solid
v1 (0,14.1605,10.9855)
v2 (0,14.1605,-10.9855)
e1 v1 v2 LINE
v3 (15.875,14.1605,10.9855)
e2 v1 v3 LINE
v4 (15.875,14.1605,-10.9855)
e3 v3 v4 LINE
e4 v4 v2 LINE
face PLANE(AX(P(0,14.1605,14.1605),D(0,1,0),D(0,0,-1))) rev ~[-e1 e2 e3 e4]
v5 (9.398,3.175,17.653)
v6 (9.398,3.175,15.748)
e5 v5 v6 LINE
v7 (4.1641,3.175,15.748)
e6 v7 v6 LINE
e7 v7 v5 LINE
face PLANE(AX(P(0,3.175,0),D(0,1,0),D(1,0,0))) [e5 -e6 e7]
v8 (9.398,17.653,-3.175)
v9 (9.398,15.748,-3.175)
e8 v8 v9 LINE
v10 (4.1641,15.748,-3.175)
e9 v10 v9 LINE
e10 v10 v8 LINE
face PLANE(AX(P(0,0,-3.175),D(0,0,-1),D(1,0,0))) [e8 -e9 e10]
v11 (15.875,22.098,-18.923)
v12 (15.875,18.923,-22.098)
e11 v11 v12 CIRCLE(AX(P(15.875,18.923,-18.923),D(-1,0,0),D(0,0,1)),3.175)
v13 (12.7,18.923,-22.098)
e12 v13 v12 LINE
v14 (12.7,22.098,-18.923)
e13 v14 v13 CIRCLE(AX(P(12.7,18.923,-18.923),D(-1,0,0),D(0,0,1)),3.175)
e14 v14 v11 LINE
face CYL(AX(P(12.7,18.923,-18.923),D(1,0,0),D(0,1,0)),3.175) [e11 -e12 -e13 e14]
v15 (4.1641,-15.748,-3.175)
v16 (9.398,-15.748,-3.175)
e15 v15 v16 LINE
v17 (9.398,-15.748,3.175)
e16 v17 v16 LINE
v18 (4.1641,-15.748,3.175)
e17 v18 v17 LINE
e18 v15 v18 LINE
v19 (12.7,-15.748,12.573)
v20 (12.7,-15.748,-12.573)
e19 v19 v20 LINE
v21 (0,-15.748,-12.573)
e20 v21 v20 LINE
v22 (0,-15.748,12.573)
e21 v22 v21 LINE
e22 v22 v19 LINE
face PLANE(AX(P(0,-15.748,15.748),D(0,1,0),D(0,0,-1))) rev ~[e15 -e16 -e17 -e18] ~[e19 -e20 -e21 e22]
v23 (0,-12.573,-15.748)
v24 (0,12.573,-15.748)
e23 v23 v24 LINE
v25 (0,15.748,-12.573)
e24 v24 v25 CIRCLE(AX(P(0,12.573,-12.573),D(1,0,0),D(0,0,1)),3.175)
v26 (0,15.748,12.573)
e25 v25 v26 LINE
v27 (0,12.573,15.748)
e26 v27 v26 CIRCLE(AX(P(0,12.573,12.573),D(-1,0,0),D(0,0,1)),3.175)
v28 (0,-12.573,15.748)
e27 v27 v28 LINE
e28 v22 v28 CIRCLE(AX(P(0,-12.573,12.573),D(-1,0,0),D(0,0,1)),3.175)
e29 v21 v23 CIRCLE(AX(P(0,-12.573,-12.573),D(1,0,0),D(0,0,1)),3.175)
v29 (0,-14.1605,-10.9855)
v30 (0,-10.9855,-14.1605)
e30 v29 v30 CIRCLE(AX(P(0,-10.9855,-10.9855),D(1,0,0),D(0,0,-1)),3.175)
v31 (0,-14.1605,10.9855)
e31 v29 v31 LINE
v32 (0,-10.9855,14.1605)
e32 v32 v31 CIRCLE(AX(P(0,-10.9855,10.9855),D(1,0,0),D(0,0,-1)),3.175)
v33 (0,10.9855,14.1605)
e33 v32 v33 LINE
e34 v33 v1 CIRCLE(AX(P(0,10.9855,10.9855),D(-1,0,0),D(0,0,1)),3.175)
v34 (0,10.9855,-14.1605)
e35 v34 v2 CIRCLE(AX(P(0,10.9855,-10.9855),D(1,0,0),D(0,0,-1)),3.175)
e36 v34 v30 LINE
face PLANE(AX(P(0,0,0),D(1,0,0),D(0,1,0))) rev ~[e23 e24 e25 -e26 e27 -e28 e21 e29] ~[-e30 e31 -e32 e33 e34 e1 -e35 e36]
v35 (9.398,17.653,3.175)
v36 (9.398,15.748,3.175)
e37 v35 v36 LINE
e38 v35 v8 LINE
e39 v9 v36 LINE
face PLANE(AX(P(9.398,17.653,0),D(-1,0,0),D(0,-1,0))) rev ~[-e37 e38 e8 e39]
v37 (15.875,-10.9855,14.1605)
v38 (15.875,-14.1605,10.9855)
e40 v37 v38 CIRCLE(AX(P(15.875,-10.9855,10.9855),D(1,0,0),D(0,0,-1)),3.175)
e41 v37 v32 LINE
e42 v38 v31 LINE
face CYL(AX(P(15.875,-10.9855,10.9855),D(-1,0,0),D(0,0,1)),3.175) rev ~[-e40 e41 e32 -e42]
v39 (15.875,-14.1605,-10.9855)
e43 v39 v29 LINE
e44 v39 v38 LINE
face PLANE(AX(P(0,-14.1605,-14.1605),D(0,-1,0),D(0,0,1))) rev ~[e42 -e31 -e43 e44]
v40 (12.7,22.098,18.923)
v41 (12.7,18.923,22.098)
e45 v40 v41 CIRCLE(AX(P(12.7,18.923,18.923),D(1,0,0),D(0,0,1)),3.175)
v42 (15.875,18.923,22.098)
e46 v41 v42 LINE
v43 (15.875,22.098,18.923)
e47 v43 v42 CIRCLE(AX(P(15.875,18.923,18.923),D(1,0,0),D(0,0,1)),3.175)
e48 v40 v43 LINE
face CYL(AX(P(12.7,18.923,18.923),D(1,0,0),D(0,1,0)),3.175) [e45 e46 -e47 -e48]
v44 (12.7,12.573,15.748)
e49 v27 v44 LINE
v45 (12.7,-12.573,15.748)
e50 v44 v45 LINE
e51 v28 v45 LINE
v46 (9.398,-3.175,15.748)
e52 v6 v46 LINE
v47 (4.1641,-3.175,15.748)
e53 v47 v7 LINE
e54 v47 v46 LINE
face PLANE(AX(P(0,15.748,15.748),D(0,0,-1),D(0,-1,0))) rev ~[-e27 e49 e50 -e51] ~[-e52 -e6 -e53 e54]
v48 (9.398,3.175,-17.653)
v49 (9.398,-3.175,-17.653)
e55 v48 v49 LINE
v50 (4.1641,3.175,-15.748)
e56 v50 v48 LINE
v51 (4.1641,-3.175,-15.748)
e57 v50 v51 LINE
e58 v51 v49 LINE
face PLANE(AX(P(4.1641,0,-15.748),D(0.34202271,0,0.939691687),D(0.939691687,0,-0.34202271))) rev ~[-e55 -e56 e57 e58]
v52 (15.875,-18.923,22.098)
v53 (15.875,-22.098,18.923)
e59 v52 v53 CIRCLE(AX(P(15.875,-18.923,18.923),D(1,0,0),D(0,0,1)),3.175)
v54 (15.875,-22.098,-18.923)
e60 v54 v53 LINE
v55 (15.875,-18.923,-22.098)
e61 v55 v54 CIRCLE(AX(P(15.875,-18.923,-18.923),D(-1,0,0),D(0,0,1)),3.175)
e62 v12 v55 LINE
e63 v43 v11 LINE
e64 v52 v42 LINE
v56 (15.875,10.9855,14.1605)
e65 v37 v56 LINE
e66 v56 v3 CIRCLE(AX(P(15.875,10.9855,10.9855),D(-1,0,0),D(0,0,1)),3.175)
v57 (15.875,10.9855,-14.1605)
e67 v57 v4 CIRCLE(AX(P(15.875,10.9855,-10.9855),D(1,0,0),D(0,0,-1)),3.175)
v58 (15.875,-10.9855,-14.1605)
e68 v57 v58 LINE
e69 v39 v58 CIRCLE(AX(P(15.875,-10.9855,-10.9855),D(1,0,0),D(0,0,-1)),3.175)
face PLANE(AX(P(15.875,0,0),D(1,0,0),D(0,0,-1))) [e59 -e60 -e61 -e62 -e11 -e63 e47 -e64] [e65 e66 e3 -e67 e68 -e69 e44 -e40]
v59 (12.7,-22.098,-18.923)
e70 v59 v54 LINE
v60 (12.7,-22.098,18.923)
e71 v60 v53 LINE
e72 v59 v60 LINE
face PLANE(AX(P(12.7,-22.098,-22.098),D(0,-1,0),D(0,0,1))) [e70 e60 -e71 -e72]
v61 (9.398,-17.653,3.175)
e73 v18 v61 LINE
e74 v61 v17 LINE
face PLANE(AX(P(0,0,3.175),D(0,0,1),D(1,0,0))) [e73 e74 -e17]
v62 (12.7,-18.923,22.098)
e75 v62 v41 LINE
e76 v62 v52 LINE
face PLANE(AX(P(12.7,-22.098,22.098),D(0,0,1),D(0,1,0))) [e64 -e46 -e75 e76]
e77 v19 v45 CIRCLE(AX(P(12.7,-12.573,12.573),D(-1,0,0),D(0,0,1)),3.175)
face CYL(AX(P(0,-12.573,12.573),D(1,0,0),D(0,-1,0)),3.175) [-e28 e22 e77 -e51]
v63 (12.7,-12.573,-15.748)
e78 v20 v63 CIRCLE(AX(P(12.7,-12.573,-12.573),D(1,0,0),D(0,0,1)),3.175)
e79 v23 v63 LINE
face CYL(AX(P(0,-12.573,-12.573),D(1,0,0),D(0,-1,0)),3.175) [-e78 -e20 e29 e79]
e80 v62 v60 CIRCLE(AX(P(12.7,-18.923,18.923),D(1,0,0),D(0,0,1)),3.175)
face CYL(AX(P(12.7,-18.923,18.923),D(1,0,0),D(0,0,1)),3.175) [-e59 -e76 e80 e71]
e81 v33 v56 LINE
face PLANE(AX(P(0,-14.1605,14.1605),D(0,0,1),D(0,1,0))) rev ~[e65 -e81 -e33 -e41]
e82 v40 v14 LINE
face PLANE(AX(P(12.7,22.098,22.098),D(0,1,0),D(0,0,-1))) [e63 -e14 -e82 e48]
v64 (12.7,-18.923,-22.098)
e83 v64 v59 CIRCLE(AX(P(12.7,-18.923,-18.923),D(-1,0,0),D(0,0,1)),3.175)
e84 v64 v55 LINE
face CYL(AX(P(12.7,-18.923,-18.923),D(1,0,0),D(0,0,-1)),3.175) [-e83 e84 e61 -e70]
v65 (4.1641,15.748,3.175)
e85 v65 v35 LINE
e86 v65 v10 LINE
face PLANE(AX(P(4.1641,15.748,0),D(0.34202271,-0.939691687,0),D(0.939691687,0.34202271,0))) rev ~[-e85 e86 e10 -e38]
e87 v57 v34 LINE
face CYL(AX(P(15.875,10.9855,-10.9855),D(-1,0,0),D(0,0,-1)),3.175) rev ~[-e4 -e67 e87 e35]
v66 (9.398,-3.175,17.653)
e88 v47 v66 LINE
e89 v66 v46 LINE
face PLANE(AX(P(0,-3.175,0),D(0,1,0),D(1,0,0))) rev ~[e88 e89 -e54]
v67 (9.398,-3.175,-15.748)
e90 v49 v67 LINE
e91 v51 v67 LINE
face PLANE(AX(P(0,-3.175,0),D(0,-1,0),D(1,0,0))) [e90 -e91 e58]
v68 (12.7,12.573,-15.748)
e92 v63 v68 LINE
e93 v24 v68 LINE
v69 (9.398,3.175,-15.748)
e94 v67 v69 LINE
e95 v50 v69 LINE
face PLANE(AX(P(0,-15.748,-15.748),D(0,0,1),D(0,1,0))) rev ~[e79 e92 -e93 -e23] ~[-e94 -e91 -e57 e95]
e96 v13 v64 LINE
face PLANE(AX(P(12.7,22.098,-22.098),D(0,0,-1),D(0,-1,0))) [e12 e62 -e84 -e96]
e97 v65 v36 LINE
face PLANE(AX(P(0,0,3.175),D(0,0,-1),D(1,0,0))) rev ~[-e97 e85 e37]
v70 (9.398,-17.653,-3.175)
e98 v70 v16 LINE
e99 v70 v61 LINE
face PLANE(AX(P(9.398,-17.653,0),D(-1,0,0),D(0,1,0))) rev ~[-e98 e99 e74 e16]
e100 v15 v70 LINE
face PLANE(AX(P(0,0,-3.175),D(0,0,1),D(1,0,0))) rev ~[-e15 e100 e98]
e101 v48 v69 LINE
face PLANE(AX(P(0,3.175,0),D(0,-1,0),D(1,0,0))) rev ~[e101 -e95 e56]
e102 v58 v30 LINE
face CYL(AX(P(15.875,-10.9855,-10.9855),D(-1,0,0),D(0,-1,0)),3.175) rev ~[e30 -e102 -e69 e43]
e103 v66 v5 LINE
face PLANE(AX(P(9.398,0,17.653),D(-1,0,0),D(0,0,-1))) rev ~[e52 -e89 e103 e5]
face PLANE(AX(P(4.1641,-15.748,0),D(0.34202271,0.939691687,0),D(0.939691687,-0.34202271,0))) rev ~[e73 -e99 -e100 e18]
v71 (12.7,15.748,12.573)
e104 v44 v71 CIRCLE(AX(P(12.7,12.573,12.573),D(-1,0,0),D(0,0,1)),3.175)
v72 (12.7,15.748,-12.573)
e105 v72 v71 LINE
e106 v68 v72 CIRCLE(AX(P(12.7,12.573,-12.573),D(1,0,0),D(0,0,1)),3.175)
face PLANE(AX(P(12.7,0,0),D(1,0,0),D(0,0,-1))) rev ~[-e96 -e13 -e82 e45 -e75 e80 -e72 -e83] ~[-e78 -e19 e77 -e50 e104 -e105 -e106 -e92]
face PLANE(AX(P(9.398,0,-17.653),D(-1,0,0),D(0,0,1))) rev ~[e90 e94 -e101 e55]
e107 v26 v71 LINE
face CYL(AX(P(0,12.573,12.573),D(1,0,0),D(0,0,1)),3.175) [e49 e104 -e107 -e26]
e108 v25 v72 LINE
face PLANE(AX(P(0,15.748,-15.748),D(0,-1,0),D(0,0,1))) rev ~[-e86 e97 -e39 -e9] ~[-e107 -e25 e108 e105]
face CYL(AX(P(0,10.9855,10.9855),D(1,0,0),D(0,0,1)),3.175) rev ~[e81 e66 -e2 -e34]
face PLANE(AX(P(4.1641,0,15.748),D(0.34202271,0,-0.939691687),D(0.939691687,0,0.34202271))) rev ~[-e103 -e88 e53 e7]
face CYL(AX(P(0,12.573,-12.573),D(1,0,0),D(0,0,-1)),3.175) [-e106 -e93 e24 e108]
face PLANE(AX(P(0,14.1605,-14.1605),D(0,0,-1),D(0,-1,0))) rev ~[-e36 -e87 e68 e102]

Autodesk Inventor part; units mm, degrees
ref_plane "YZ Plane" through (0, 0, 0) normal (1, 0, 0) x (0, 1, 0)
ref_plane "XZ Plane" through (0, 0, 0) normal (0, 1, 0) x (-1, 0, 0)
ref_plane "XY Plane" through (0, 0, 0) normal (0, 0, 1) x (1, 0, 0)
sketch "Sketch1" plane through (0, 0, 0) normal (1, 0, 0) x (0, 1, 0)
  line L0 (-15.748, -15.748) -> (15.748, -15.748)
  line L1 (15.748, -15.748) -> (15.748, 15.748)
  line L2 (15.748, 15.748) -> (-15.748, 15.748)
  line L3 (-15.748, 15.748) -> (-15.748, -15.748)
  line L4 (-15.748, -15.748) -> (15.748, 15.748) construction
  line L5 (15.748, -15.748) -> (-15.748, 15.748) construction
  line L6 (14.1605, 14.1605) -> (14.1605, -14.1605)
  line L7 (14.1605, -14.1605) -> (-14.1605, -14.1605)
  line L8 (-14.1605, -14.1605) -> (-14.1605, 14.1605)
  line L9 (-14.1605, 14.1605) -> (14.1605, 14.1605)
  point P0 (0, 0)
  dimension "d0" = 31.496
  dimension "d1" = 31.496
  dimension "d2" = 1.5875
extrude "Extrusion1" add sketch "Sketch1" along normal blind 12.7
sketch "Sketch2" plane through (12.7, 0, 0) normal (1, 0, 0) x (0, 0, -1)
  line L0 (15.748, 15.748) -> (-15.748, 15.748) projected
  line L1 (-15.748, 15.748) -> (-15.748, -15.748) projected
  line L2 (-15.748, -15.748) -> (15.748, -15.748) projected
  line L3 (15.748, -15.748) -> (15.748, 15.748) projected
  line L4 (-14.1605, 14.1605) -> (14.1605, 14.1605) projected
  line L5 (14.1605, 14.1605) -> (14.1605, -14.1605) projected
  line L6 (14.1605, -14.1605) -> (-14.1605, -14.1605) projected
  line L7 (-14.1605, -14.1605) -> (-14.1605, 14.1605) projected
  line L8 (-22.098, 22.098) -> (22.098, 22.098)
  line L9 (22.098, 22.098) -> (22.098, -22.098)
  line L10 (22.098, -22.098) -> (-22.098, -22.098)
  line L11 (-22.098, -22.098) -> (-22.098, 22.098)
  point P0 (0, 0)
  dimension "d5" = 6.35
extrude "Extrusion2" add sketch "Sketch2" along normal blind 3.175 contours L3 L2 L1 L0 | L8 L9 L10 L11
fillet "Fillet1" radius 3.175 12 edges at (6.35, 15.748, 15.748) (6.35, 15.748, -15.748) (6.35, -15.748, 15.748) (6.35, -15.748, -15.748) (7.9375, 14.1605, 14.1605) (7.9375, -14.1605, 14.1605) (7.9375, -14.1605, -14.1605) (7.9375, 14.1605, -14.1605) (14.2875, -22.098, 22.098) (14.2875, -22.098, -22.098) (14.2875, 22.098, -22.098) (14.2875, 22.098, 22.098)
sketch "Sketch4" plane through (0, 0, 0) normal (0, 0, 1) x (1, 0, 0)
  line L0 (0, -15.748) -> (12.7, -15.748) construction
  line L1 (4.1641, -15.748) -> (9.398, -17.653)
  line L2 (9.398, -17.653) -> (9.398, -15.748)
  line L3 (12.7, -18.923) -> (12.7, 18.923) construction
  line L4 (4.1641, -15.748) -> (9.398, -15.748)
  point P0 (0, 0)
  dimension "d9" = 3.302
  dimension "d10" = 1.905
  dimension "d11" = 20
extrude "Extrusion3" add sketch "Sketch4" along normal mid plane 6.35
pattern_circular "Circular Pattern1" count 4 over 360 about axis through (-10, 0, 0) along (1, 0, 0) of "Extrusion3"
properties part number "DB1-013" material "ABS Plastic"
